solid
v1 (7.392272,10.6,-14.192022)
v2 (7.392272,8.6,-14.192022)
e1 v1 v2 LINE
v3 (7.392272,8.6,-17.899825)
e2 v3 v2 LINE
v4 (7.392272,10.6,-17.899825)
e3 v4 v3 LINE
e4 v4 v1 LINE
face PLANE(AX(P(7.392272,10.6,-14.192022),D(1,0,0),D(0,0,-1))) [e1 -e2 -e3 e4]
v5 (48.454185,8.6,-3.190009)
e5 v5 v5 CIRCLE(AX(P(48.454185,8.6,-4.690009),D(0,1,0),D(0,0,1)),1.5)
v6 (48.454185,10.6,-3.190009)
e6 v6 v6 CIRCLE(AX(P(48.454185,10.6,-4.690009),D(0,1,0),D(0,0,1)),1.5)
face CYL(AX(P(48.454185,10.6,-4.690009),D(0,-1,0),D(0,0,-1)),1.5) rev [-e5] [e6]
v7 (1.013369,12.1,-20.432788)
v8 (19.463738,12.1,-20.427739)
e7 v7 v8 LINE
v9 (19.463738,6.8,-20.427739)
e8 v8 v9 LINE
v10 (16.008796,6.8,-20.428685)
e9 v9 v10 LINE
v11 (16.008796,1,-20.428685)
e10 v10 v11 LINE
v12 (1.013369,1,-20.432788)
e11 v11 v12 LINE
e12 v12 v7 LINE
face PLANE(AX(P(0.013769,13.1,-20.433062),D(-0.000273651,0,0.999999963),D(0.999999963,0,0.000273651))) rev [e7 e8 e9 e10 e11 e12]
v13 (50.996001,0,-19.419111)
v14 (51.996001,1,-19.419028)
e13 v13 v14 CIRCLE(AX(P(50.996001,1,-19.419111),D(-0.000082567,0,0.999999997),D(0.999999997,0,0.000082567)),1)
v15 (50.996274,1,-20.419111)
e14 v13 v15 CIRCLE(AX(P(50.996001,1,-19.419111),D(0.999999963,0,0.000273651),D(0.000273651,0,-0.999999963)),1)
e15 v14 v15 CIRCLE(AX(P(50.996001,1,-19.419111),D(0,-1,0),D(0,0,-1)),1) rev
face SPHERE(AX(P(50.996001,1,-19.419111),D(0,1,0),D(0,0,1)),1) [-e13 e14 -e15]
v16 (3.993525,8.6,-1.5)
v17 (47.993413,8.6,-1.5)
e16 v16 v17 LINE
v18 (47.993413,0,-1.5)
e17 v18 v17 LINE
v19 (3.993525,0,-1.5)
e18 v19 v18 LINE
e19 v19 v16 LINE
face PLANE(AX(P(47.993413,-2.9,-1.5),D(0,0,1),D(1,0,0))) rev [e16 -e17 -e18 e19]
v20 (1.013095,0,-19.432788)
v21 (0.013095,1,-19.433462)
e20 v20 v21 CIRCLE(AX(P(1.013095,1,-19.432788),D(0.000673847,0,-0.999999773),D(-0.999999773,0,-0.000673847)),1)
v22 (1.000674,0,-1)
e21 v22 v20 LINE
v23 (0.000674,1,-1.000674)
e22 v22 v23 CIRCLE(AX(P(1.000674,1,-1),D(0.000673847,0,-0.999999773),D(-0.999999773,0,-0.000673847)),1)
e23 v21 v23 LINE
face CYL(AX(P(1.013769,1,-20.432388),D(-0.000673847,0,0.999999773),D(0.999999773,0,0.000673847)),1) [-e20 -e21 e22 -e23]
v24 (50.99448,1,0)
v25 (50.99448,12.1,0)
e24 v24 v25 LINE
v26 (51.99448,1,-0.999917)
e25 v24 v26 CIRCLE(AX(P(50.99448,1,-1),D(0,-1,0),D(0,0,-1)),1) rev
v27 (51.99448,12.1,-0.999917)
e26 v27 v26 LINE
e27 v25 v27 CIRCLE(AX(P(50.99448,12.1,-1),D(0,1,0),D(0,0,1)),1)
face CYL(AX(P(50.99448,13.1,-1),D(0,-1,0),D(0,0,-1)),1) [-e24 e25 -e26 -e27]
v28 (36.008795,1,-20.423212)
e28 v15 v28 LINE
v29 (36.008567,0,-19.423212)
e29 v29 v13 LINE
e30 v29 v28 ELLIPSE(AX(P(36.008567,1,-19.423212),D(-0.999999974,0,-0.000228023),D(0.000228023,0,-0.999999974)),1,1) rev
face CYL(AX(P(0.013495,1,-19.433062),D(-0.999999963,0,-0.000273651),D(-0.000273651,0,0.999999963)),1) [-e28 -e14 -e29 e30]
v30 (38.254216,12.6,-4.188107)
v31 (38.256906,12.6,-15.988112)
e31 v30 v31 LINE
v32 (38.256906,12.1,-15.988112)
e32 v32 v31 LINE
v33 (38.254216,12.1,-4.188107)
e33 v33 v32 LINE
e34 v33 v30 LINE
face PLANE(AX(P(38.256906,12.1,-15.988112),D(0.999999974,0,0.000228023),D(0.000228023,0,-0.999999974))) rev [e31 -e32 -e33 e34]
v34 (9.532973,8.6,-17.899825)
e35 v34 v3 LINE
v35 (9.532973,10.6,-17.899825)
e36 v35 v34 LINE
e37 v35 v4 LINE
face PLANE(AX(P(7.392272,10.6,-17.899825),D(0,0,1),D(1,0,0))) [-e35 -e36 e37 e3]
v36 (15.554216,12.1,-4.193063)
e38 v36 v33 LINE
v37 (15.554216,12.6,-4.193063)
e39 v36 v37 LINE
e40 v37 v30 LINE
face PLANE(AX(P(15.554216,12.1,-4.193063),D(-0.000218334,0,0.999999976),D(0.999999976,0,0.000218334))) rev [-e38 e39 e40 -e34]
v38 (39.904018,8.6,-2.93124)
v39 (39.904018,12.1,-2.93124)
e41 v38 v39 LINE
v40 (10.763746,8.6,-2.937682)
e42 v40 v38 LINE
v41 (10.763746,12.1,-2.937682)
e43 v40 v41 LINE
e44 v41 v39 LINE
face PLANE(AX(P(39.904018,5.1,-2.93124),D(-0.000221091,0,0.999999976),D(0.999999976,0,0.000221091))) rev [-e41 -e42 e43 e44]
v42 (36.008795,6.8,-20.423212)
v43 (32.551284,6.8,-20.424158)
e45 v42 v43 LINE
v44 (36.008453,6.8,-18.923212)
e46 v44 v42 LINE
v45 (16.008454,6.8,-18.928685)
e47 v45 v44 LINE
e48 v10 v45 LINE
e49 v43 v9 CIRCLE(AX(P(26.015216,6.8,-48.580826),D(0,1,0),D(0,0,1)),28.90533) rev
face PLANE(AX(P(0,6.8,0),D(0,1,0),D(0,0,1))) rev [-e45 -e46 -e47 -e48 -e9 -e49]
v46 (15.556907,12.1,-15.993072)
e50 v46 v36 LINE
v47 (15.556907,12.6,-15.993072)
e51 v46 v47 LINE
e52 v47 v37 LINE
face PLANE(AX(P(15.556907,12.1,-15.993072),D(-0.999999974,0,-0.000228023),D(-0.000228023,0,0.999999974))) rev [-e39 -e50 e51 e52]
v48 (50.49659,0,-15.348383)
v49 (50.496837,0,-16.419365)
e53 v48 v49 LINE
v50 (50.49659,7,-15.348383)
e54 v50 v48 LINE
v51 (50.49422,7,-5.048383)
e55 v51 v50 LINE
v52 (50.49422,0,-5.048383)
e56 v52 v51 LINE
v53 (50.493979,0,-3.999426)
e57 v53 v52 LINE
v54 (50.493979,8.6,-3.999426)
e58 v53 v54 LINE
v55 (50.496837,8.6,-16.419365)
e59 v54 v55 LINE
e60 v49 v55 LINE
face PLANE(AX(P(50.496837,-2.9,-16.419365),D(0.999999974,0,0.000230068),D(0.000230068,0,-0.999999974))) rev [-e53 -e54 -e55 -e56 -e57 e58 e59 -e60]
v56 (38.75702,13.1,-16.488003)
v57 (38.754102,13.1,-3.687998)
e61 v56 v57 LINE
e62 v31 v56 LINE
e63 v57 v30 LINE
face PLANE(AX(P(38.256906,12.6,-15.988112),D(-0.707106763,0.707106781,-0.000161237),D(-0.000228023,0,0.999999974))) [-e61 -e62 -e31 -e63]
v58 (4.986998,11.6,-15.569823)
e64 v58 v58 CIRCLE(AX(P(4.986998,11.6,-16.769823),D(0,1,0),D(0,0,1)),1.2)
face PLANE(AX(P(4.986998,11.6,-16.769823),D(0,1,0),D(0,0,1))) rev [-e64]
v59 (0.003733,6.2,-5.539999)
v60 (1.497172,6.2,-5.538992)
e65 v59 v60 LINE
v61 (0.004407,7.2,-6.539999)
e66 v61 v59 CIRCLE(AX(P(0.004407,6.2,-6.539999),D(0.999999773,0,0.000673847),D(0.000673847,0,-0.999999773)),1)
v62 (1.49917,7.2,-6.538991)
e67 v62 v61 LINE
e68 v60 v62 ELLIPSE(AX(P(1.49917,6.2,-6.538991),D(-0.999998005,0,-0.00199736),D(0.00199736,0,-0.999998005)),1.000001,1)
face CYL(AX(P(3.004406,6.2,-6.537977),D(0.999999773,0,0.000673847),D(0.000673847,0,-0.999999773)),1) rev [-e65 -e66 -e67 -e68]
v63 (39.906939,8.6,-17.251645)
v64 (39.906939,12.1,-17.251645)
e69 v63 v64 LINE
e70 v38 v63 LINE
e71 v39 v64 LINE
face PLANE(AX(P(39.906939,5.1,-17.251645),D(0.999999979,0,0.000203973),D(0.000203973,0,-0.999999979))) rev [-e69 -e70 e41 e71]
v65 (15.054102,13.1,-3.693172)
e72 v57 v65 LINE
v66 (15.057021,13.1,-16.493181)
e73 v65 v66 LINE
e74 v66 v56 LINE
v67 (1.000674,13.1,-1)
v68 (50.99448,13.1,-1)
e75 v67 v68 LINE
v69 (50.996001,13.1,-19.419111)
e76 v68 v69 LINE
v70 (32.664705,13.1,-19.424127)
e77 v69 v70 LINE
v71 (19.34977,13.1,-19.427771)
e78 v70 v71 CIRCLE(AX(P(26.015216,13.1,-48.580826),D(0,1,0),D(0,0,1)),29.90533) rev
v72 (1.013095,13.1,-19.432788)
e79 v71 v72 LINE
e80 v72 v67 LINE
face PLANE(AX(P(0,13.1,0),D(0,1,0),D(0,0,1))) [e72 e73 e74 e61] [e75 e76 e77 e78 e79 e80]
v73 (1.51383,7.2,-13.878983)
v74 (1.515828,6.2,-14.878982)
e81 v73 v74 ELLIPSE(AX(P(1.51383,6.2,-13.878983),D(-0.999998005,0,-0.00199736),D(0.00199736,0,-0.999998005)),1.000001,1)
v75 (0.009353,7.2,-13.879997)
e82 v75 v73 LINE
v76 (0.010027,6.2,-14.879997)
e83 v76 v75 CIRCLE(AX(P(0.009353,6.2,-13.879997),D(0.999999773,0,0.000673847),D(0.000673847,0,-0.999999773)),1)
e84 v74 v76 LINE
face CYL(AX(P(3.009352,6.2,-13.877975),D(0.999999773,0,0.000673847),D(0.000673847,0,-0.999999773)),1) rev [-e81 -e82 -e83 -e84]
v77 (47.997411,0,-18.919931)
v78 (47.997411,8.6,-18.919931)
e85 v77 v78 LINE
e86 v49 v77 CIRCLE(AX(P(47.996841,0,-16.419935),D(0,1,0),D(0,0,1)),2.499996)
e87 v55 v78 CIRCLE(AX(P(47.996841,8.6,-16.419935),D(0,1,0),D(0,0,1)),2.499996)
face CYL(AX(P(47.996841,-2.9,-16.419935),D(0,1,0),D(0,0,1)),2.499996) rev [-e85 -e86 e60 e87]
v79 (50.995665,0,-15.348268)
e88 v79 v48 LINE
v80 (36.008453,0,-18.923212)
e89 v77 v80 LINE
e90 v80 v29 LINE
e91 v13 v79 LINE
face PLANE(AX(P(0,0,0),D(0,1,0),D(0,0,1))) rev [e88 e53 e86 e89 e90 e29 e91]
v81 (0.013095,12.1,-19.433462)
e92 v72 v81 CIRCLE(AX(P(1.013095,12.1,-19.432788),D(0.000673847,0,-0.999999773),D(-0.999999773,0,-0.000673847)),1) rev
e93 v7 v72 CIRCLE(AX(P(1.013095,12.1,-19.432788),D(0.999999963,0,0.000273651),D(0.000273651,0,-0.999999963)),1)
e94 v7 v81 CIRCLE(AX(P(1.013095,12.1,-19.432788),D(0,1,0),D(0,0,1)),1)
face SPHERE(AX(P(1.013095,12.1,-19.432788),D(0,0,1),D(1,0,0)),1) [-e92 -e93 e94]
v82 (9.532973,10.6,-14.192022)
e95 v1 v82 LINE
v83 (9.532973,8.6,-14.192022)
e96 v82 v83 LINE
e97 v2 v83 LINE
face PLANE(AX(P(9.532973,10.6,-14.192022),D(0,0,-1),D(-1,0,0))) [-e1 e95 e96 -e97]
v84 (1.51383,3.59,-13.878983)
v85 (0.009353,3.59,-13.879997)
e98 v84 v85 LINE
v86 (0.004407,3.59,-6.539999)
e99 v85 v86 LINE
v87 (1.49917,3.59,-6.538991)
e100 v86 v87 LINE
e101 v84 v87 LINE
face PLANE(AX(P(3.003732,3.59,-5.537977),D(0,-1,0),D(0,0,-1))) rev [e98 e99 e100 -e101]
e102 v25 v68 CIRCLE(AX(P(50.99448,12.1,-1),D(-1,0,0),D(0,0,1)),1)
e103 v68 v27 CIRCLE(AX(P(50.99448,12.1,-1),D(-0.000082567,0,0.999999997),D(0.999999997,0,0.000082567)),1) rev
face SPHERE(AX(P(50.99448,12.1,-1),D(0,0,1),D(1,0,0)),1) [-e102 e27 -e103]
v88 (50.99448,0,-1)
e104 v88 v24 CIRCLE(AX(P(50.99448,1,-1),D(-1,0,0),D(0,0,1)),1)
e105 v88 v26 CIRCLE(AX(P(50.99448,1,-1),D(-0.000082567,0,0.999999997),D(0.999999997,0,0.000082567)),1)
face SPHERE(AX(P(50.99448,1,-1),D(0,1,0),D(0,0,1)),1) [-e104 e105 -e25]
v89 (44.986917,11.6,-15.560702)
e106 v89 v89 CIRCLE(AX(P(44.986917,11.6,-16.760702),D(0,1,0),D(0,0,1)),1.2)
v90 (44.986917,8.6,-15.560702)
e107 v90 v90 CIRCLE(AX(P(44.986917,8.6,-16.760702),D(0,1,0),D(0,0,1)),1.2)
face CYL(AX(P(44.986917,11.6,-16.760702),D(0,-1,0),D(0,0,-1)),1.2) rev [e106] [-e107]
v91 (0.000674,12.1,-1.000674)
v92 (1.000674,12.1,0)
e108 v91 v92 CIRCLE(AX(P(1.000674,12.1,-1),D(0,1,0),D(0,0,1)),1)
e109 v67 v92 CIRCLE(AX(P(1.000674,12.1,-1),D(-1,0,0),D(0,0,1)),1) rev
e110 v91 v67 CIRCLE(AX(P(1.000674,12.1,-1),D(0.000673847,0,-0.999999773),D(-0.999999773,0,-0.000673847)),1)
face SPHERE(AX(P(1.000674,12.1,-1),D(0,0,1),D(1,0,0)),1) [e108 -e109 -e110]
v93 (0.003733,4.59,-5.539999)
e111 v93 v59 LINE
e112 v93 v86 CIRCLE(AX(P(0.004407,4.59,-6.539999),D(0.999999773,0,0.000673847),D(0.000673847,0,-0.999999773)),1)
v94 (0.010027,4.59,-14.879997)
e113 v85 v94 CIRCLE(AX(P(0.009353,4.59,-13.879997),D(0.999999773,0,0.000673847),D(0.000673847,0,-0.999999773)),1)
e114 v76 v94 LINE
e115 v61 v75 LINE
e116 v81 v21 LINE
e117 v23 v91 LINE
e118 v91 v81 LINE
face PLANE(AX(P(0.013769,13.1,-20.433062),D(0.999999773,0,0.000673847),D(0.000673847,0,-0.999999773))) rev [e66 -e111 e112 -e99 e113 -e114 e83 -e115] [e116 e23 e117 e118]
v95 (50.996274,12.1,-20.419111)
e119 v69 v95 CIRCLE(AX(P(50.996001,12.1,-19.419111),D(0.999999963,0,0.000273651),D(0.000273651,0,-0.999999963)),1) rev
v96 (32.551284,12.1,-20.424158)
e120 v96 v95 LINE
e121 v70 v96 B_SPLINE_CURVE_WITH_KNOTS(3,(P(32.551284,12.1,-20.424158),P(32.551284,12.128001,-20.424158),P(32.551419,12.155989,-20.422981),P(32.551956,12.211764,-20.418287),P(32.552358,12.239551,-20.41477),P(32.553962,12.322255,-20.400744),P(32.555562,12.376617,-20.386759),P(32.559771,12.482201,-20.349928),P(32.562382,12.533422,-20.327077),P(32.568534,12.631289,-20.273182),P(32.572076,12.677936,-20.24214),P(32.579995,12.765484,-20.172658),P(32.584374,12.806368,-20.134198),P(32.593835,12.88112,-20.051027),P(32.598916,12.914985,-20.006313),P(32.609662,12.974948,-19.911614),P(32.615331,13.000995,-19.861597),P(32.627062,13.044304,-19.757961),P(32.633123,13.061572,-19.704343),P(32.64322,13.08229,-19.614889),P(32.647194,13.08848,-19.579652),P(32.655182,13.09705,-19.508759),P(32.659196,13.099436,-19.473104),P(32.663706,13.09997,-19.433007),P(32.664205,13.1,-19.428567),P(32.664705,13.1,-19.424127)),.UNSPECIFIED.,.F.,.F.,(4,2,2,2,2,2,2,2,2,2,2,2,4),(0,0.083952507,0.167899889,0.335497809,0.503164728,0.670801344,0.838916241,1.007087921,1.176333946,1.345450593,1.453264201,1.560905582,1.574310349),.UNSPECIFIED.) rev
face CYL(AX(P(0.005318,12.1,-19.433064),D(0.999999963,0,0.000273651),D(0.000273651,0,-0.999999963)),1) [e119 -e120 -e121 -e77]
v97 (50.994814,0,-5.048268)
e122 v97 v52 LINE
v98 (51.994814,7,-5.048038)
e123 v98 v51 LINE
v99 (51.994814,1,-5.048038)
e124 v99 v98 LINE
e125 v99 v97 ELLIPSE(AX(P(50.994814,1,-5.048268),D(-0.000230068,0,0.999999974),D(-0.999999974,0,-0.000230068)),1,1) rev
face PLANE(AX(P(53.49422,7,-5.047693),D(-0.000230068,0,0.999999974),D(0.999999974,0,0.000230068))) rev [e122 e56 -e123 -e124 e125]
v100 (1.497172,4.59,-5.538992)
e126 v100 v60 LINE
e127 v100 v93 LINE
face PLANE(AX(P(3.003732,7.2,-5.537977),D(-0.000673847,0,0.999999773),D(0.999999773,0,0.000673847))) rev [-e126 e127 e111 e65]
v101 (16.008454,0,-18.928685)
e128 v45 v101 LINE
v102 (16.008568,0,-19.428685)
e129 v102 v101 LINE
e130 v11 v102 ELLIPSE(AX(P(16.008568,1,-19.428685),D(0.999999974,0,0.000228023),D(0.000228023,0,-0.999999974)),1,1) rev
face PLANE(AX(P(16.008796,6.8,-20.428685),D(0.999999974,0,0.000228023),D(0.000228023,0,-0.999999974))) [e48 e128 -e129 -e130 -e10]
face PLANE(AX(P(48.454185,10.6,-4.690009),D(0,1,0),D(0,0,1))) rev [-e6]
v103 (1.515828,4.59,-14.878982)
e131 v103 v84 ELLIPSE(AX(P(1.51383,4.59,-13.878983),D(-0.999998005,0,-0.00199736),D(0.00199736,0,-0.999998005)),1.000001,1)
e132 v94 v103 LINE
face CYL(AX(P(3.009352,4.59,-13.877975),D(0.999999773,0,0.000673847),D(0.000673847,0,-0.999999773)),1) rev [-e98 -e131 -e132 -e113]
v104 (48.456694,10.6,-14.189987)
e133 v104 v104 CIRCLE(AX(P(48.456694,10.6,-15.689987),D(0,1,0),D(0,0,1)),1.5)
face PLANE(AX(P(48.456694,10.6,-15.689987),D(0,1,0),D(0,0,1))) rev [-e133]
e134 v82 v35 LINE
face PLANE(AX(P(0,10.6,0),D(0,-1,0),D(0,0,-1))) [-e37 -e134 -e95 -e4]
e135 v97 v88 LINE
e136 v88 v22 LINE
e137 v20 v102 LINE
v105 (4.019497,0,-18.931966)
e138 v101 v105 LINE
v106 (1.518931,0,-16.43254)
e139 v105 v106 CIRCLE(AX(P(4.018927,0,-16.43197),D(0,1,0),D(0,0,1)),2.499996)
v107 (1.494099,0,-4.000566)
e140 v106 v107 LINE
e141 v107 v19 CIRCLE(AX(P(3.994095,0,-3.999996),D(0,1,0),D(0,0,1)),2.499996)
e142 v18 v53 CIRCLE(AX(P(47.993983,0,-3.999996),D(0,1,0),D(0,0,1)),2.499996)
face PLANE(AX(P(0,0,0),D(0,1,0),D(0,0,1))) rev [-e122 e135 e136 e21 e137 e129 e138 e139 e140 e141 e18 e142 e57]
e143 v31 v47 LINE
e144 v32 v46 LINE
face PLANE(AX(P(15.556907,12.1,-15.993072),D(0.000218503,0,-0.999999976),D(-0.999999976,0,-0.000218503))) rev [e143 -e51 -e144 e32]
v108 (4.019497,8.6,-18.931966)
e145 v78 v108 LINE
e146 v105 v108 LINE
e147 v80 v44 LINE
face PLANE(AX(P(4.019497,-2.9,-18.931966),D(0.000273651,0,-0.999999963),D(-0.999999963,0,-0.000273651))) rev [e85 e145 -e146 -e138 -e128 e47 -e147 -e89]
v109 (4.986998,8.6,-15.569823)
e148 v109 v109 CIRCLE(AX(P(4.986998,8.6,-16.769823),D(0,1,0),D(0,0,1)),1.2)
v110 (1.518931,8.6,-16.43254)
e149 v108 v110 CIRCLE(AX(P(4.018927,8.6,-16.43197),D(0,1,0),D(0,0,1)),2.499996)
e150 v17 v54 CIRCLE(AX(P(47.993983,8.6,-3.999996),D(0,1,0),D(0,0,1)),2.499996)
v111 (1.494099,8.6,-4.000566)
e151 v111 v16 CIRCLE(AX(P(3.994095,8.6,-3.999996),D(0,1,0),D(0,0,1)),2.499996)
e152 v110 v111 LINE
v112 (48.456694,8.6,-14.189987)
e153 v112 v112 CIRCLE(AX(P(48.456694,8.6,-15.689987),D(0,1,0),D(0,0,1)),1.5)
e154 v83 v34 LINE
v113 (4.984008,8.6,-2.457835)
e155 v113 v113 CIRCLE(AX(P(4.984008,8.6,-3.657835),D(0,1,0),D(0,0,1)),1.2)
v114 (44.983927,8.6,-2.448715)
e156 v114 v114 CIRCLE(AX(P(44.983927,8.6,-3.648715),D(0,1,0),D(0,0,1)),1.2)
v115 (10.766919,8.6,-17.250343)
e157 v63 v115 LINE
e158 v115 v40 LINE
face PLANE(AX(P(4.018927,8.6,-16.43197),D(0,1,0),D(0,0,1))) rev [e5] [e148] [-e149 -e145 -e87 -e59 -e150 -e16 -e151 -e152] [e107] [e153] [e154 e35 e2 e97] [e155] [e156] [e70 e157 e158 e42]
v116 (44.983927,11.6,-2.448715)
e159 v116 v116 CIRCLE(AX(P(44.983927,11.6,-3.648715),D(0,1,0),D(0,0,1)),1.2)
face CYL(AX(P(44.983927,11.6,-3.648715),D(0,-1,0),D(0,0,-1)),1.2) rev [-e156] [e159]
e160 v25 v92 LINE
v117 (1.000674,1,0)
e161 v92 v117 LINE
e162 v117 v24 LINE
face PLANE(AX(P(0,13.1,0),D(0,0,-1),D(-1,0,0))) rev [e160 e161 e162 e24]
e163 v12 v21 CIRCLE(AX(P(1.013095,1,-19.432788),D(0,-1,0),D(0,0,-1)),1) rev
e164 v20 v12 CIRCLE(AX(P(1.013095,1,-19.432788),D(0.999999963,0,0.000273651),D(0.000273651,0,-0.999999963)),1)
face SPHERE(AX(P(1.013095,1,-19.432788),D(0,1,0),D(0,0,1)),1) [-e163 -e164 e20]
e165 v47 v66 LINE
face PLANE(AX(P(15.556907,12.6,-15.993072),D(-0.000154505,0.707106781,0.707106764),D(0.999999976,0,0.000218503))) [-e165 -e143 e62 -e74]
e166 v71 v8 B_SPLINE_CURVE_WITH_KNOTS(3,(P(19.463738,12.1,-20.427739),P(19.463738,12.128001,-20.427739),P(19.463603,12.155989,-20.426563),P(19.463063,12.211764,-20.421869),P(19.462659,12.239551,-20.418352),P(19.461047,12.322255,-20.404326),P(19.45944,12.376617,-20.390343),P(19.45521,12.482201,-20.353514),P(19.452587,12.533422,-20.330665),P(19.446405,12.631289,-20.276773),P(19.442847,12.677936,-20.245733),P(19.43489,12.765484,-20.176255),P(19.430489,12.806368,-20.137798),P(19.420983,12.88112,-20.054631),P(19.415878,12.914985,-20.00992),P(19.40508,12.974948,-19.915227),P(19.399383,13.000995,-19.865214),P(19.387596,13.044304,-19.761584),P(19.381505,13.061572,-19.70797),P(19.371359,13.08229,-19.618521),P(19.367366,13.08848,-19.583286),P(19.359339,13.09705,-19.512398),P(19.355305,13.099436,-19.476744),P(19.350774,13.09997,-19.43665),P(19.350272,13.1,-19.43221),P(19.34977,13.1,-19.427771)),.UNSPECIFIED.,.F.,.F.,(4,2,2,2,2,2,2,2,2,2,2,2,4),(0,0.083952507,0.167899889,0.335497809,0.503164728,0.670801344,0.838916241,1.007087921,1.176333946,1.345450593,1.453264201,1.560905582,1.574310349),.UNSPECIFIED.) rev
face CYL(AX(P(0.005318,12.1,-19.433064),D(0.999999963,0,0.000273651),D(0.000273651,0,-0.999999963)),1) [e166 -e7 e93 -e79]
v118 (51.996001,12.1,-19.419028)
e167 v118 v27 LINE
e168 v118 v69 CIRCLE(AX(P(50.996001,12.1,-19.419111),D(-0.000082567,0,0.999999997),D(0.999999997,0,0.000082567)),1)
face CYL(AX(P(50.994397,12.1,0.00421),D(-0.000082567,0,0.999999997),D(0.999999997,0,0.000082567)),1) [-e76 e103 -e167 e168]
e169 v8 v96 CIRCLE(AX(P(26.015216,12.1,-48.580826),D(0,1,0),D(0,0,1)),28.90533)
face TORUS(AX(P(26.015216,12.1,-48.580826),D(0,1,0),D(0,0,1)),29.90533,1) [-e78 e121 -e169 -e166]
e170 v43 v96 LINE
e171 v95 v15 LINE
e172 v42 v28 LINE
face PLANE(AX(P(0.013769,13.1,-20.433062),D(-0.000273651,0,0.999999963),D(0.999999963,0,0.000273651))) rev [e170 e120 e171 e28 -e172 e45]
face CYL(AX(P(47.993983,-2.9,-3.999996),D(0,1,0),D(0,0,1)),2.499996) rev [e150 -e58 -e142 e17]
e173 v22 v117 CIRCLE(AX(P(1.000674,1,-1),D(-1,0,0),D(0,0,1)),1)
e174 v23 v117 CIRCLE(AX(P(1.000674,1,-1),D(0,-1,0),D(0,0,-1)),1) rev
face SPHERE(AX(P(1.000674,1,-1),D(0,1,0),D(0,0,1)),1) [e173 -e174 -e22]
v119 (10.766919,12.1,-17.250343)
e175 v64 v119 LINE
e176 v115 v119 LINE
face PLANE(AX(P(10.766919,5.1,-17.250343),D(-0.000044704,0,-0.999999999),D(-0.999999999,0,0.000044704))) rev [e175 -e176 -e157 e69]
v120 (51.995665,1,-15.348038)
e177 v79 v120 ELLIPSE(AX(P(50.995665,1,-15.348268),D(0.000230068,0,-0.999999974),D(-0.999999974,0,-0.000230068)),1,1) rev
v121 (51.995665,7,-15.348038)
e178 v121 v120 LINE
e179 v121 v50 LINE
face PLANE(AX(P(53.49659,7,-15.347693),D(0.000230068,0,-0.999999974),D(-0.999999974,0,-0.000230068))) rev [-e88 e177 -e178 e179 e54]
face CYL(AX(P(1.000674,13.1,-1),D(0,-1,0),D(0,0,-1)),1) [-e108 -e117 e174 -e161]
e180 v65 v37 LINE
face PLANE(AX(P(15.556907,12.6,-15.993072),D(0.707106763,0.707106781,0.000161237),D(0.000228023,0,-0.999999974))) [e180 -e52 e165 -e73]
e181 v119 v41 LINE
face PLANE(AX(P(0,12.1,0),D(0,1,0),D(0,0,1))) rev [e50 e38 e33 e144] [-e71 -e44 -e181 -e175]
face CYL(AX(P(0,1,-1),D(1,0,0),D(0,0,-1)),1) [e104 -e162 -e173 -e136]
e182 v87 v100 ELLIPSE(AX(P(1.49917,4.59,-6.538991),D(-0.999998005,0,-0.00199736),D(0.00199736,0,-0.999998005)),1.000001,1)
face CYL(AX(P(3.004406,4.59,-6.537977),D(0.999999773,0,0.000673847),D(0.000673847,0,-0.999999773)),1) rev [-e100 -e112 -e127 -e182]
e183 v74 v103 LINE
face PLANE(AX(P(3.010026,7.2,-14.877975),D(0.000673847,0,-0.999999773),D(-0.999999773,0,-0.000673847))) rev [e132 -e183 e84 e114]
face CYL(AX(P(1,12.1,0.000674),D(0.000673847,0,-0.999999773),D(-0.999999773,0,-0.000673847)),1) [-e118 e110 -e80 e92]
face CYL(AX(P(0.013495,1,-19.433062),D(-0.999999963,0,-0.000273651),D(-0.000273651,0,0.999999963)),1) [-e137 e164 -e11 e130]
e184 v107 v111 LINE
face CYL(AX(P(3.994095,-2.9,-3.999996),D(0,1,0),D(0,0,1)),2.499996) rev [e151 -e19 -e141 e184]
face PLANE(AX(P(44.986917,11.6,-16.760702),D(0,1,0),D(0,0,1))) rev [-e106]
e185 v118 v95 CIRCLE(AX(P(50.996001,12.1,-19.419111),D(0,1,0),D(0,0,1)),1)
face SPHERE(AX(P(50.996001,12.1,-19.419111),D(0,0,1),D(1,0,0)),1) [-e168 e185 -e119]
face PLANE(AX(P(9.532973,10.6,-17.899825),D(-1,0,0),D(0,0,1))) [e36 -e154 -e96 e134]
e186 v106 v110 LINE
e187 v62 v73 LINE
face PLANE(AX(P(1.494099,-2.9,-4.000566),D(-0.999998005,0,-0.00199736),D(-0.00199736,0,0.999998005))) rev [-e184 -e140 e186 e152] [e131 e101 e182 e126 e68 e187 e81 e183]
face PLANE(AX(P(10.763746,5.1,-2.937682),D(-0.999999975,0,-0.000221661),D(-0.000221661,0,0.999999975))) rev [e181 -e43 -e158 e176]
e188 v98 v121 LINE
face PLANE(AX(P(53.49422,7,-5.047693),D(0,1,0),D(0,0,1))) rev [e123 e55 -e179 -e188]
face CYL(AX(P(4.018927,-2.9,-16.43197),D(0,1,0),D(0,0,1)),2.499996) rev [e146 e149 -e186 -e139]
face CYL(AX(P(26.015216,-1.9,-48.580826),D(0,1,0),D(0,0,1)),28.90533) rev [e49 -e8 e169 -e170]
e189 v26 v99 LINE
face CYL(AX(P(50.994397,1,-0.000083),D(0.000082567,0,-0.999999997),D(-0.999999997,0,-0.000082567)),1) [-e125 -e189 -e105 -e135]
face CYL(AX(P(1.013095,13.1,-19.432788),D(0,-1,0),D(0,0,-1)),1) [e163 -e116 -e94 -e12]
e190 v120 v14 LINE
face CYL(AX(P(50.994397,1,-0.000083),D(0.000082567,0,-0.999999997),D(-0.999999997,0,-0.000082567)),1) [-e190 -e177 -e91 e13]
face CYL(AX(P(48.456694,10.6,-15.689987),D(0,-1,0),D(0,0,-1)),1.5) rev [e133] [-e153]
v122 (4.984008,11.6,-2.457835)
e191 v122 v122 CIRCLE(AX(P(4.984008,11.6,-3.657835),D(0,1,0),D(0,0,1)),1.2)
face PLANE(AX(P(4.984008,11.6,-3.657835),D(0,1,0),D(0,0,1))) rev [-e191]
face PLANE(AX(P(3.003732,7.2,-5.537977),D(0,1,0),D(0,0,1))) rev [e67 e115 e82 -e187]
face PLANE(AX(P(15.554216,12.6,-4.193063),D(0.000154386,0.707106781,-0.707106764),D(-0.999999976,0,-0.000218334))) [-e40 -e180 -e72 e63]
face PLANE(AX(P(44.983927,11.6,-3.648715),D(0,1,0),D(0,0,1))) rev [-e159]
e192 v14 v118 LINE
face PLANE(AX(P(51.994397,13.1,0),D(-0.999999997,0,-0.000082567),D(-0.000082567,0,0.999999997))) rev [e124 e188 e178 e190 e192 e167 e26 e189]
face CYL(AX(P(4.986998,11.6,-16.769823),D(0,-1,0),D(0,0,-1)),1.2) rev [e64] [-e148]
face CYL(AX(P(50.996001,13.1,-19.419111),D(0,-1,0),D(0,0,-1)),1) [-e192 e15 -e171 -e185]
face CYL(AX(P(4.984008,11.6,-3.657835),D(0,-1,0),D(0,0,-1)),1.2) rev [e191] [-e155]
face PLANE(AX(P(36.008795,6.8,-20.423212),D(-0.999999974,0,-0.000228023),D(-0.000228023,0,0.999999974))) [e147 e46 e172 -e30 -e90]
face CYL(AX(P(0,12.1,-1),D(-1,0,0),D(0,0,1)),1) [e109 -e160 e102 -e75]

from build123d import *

# Parameters (mm, degrees)
EXTRUDE_1_DEPTH      = 13.1
CUT_EXTRUDE_1_DEPTH  = 1
CUT_EXTRUDE_2_DEPTH  = 3.5
CUT_EXTRUDE_3_DEPTH  = 11.5
SKETCH_7_R           = 1.2
CUT_EXTRUDE_4_DEPTH  = 3
CUT_EXTRUDE_5_DEPTH  = 3
SKETCH_17_W          = 10.3
SKETCH_17_H          = 7
CUT_EXTRUDE_7_DEPTH  = 3
SKETCH_23_R          = 28.905330341
CUT_EXTRUDE_16_DEPTH = 15
FILLET_1_R           = 1
FILLET_2_R           = 1
CHAMFER_1_SIZE       = 0.5
FILLET_3_R           = 1
SKETCH_24_W          = 2.140700812
SKETCH_24_H          = 3.70780257
CUT_EXTRUDE_17_DEPTH = 2
FILLET_4_R           = 1
CUT_EXTRUDE_18_DEPTH = 7
SKETCH_27_R          = 1.5
CUT_EXTRUDE_19_DEPTH = 2
CUT_EXTRUDE_20_DEPTH = 6.8


with BuildPart() as part:
    # 草图2 → 凸台-拉伸1 (new body)
    with BuildSketch(Plane(origin=(0, 0, 0), x_dir=(1, 0, 0), z_dir=(0, 1, 0))):
        Polygon((0.013768766, 20.433061971), (0, 0), (51.994397286, 0), (51.996083203, 20.418836971), align=None)
    extrude(amount=EXTRUDE_1_DEPTH)

    # 草图3 → 切除-拉伸1 (cut)
    with BuildSketch(Plane(origin=(0, 13.1, 0), x_dir=(1, 0, 0), z_dir=(0, 1, 0))):
        Polygon((15.554216141, 4.193063032), (38.254215601, 4.188106843), (38.256906278, 15.988112082), (15.556906819, 15.993072091), align=None)
    extrude(amount=-CUT_EXTRUDE_1_DEPTH, mode=Mode.SUBTRACT)

    # 草图4 → 切除-拉伸2 (cut)
    with BuildSketch(Plane(origin=(0, 12.1, 0), x_dir=(1, 0, 0), z_dir=(0, 1, 0))):
        Polygon((11.266979682, 17.10036488), (39.706985915, 17.101636261), (39.703966397, 3.081173841), (11.263967233, 3.087658824), align=None)
    extrude(amount=-CUT_EXTRUDE_2_DEPTH, mode=Mode.SUBTRACT)

    # 草图6 → 切除-拉伸3 (cut)
    with BuildSketch(Plane(origin=(0, 8.6, 0), x_dir=(1, 0, 0), z_dir=(0, 1, 0))):
        with BuildLine():
            Line((4.019496655, 18.931965744), (47.997410654, 18.919931154))
            ThreePointArc((47.997410654, 18.919931154), (49.765007767, 18.187296206), (50.496836532, 16.419365162))
            Line((50.496836532, 16.419365162), (50.493979096, 3.999425891))
            ThreePointArc((50.493979096, 3.999425891), (49.761344148, 2.231828778), (47.993413104, 1.500000013))
            Line((47.993413104, 1.500000013), (3.99352536, 1.500000013))
            ThreePointArc((3.99352536, 1.500000013), (2.225928247, 2.232634961), (1.494099482, 4.000566005))
            Line((1.494099482, 4.000566005), (1.518930662, 16.432539866))
            ThreePointArc((1.518930662, 16.432539866), (2.25156561, 18.200136979), (4.019496655, 18.931965744))
        make_face()
    extrude(amount=-CUT_EXTRUDE_3_DEPTH, mode=Mode.SUBTRACT)

    # 草图7 → 切除-拉伸4 (cut)
    with BuildSketch(Plane(origin=(0, 8.6, 0), x_dir=(1, 0, 0), z_dir=(0, 1, 0))):
        with Locations(Location((4.986997661, 16.769823075, 0), (0, 0, 270))):
            Circle(SKETCH_7_R)
        with Locations(Location((4.984007822, 3.657835416, 0), (0, 0, 270))):
            Circle(SKETCH_7_R)
        with Locations(Location((44.986916621, 16.760702161, 0), (0, 0, 270))):
            Circle(SKETCH_7_R)
        with Locations(Location((44.983926782, 3.648714502, 0), (0, 0, 270))):
            Circle(SKETCH_7_R)
    extrude(amount=CUT_EXTRUDE_4_DEPTH, mode=Mode.SUBTRACT)

    # 草图15 → 切除-拉伸5 (cut)
    with BuildSketch(Plane(origin=(0, 0, 0), x_dir=(-0.0006738472400635568, 0, 0.9999997729649228), z_dir=(-0.9999997729649228, 0, -0.0006738472400635568))):
        Polygon((-5.54, 3.59), (-10.21, 3.59), (-14.88, 3.59), (-14.88, 7.2), (-5.54, 7.2), align=None)
    extrude(amount=-CUT_EXTRUDE_5_DEPTH, mode=Mode.SUBTRACT)

    # 草图17 → 切除-拉伸7 (cut)
    with BuildSketch(Plane(origin=(50.493056282, 0, 0.011616857), x_dir=(-0.00023006840747121236, 0, 0.9999999735342636), z_dir=(-0.9999999735342636, 0, -0.00023006840747121236))):
        with Locations((-10.21, 3.5)):
            Rectangle(SKETCH_17_W, SKETCH_17_H)
    extrude(amount=-CUT_EXTRUDE_7_DEPTH, mode=Mode.SUBTRACT)

    # 草图23 → 切除-拉伸16 (cut)
    with BuildSketch(Plane(origin=(0, 13.1, 0), x_dir=(1, 0, 0), z_dir=(0, 1, 0))):
        with Locations((26.015215658, 48.580825692)):
            Circle(SKETCH_23_R)
    extrude(amount=-CUT_EXTRUDE_16_DEPTH, mode=Mode.SUBTRACT)

    # 圆角1
    fillet_1_edges = [part.edges().sort_by_distance(p)[0] for p in [
        (25.997198643, 13.1, 0),
        (9.738753423, 13.1, -20.430400722),
        (26.007305692, 13.1, -19.675496433),
        (51.995240244, 13.1, -10.209418486),
        (42.273683616, 13.1, -20.421497513),
        (0.006884383, 13.1, -10.216530986),
    ]]
    fillet(fillet_1_edges, radius=FILLET_1_R)

    # 圆角2
    # the kernel refuses this fillet: 1 mm, written as the material it takes off along each edge
    with BuildSketch(Plane(origin=(50.996000655, 12.1, -19.419110607), x_dir=(0.9999999965913674, 0, 8.256673242544318e-05), z_dir=(0, 1, 0))) as fillet_2_piece_1_section:
        Polygon((0, 0), (FILLET_2_R, 0), (FILLET_2_R, FILLET_2_R * 0.999808934229), (FILLET_2_R * 0.00019108402398, FILLET_2_R * 0.999999981743), align=None)
    fillet_2_piece_1 = extrude(amount=FILLET_2_R, mode=Mode.PRIVATE)
    fillet_2_piece_1 = fillet_2_piece_1 - Plane(origin=(50.996000655, 12.1, -19.419110607), x_dir=(-0.707232711871647, 0, 0.706980828070094), z_dir=(0, 1, 0)) * Sphere(FILLET_2_R, mode=Mode.PRIVATE)
    add(fillet_2_piece_1, mode=Mode.SUBTRACT)
    with BuildSketch(Plane(origin=(50.994479849, 12.1, -1), x_dir=(0, 0, 1), z_dir=(0, 1, 0))) as fillet_2_piece_2_section:
        Polygon((0, 0), (FILLET_2_R, 0), (FILLET_2_R, FILLET_2_R * 0.999917436676), (FILLET_2_R * 8.25667324293e-05, FILLET_2_R * 0.999999996591), align=None)
    fillet_2_piece_2 = extrude(amount=FILLET_2_R, mode=Mode.PRIVATE)
    fillet_2_piece_2 = fillet_2_piece_2 - Plane(origin=(50.994479849, 12.1, -1), x_dir=(-0.707077588835758, 0, -0.7071359723322034), z_dir=(0, 1, 0)) * Sphere(FILLET_2_R, mode=Mode.PRIVATE)
    add(fillet_2_piece_2, mode=Mode.SUBTRACT)
    with BuildSketch(Plane(origin=(1.013094961, 12.1, -19.432788467), x_dir=(-0.9999997729649228, 0, -0.0006738472400635567), z_dir=(0, 1, 0))) as fillet_2_piece_3_section:
        Polygon((0, 0), (FILLET_2_R, 0), (FILLET_2_R, -FILLET_2_R * 0.999599883524), (FILLET_2_R * 0.000400196522714, -FILLET_2_R * 0.999999919921), align=None)
    fillet_2_piece_3 = extrude(amount=FILLET_2_R, mode=Mode.PRIVATE)
    fillet_2_piece_3 = fillet_2_piece_3 - Plane(origin=(1.013094961, 12.1, -19.432788467), x_dir=(0.706771710700509, 0, 0.7074416929708596), z_dir=(0, 1, 0)) * Sphere(FILLET_2_R, mode=Mode.PRIVATE)
    add(fillet_2_piece_3, mode=Mode.SUBTRACT)
    with BuildSketch(Plane(origin=(1.000674074, 12.1, -1), x_dir=(-0.9999997729649228, 0, -0.0006738472400635567), z_dir=(0, 1, 0))) as fillet_2_piece_4_section:
        Polygon((0, 0), (FILLET_2_R, 0), (FILLET_2_R, FILLET_2_R * 1.00067407443), (-FILLET_2_R * 0.000673847240067, FILLET_2_R * 0.999999772965), align=None)
    fillet_2_piece_4 = extrude(amount=FILLET_2_R, mode=Mode.PRIVATE)
    fillet_2_piece_4 = fillet_2_piece_4 - Plane(origin=(1.000674074, 12.1, -1), x_dir=(0.707344982042023, 0, -0.7068685000620484), z_dir=(0, 1, 0)) * Sphere(FILLET_2_R, mode=Mode.PRIVATE)
    add(fillet_2_piece_4, mode=Mode.SUBTRACT)
    with BuildSketch(Plane(origin=(0, -2.501685186, 0), x_dir=(0.0006738472400635051, 0, -0.9999997729649227), z_dir=(0, 1, 0))) as fillet_2_piece_5:
        with BuildLine():
            CenterArc((FILLET_2_R * 1.00067407443, -FILLET_2_R), FILLET_2_R, 90, 90.038608606)
            Line((FILLET_2_R * 0.000674301463259, -FILLET_2_R * 1.00067384724), (0, 0))
            Line((0, 0), (FILLET_2_R * 1.00067407443, 0))
        make_face()
    extrude(amount=14.601685186, mode=Mode.SUBTRACT)
    with BuildSketch(Plane(origin=(0.013768766, -2.498999709, -20.433061971), x_dir=(-0.0006738472400636408, 0, 0.9999997729649228), z_dir=(0, 1, 0))) as fillet_2_piece_6:
        with BuildLine():
            CenterArc((FILLET_2_R * 0.999599883524, FILLET_2_R), FILLET_2_R, 180.022929572, 89.977070428)
            Line((-FILLET_2_R * 0.000400036397496, FILLET_2_R * 0.999599803477), (0, 0))
            Line((0, 0), (FILLET_2_R * 0.999599883524, 0))
        make_face()
    extrude(amount=14.598999709, mode=Mode.SUBTRACT)
    with BuildSketch(Plane(origin=(51.994397286, -2.499793592, 0), x_dir=(-1, 0, 0), z_dir=(0, 1, 0))) as fillet_2_piece_7:
        with BuildLine():
            CenterArc((FILLET_2_R * 0.999917436676, -FILLET_2_R), FILLET_2_R, 90, 89.995269275)
            Line((-FILLET_2_R * 8.2559915445e-05, -FILLET_2_R * 0.999917433268), (0, 0))
            Line((0, 0), (FILLET_2_R * 0.999917436676, 0))
        make_face()
    extrude(amount=14.599793592, mode=Mode.SUBTRACT)
    with BuildSketch(Plane(origin=(51.996083203, -2.499522336, -20.418836971), x_dir=(-8.256673242407848e-05, 0, 0.9999999965913674), z_dir=(0, 1, 0))) as fillet_2_piece_8:
        with BuildLine():
            CenterArc((FILLET_2_R * 0.999808934229, -FILLET_2_R), FILLET_2_R, 90, 89.989051692)
            Line((-FILLET_2_R * 0.000191047514369, -FILLET_2_R * 0.999808915976), (0, 0))
            Line((0, 0), (FILLET_2_R * 0.999808934229, 0))
        make_face()
    extrude(amount=14.599522336, mode=Mode.SUBTRACT)

    # 倒角1
    chamfer_1_edges = [part.edges().sort_by_distance(p)[0] for p in [
        (15.55556148, 13.1, -10.093067561),
        (26.904215871, 13.1, -4.190584937),
        (38.25556094, 13.1, -10.088109463),
        (26.906906548, 13.1, -15.990592087),
    ]]
    chamfer(chamfer_1_edges, length=CHAMFER_1_SIZE)

    # 圆角3
    # the kernel refuses this fillet: 1 mm, written as the material it takes off along each edge
    with BuildSketch(Plane(origin=(51.995458107, 0, -12.848037855), x_dir=(0, 1, 0), z_dir=(8.256673242544318e-05, 0, -0.9999999965913674))) as fillet_3_piece_1:
        with BuildLine():
            CenterArc((FILLET_3_R, -FILLET_3_R), FILLET_3_R, 90, 90)
            Line((0, -FILLET_3_R), (0, 0))
            Line((0, 0), (FILLET_3_R, 0))
        make_face()
    extrude(amount=6.570990208, mode=Mode.SUBTRACT)
    with BuildSketch(Plane(origin=(21.963737986, 0, -20.427055345), x_dir=(0, 1, 0), z_dir=(-0.9999999625576317, 0, -0.0002736507542471488))) as fillet_3_piece_2:
        with BuildLine():
            CenterArc((FILLET_3_R, -FILLET_3_R), FILLET_3_R, 90, 90)
            Line((0, -FILLET_3_R), (0, 0))
            Line((0, 0), (FILLET_3_R, 0))
        make_face()
    extrude(amount=20.950370159, mode=Mode.SUBTRACT)
    with BuildSketch(Plane(origin=(26.015215658, 0, -48.580825692), x_dir=(-0.309941939695479, 0, 0.9507554859256947), z_dir=(-0.9507554859256947, 0, -0.309941939695479))) as fillet_3_piece_3:
        with BuildLine():
            CenterArc((28.905330341 + FILLET_3_R, FILLET_3_R), FILLET_3_R, 180, 90)
            Line((28.905330341 + FILLET_3_R, 0), (28.905330341, 0))
            Line((28.905330341, 0), (28.905330341, FILLET_3_R))
        make_face()
    revolve(axis=Axis((26.015215658, 0, -48.580825692), (0, 1, 0)), revolution_arc=36.08010502, mode=Mode.SUBTRACT)
    with BuildSketch(Plane(origin=(50.996274306, 0, -20.41911057), x_dir=(0, 1, 0), z_dir=(-0.9999999625576317, 0, -0.0002736507542471488))) as fillet_3_piece_4:
        with BuildLine():
            CenterArc((FILLET_3_R, -FILLET_3_R), FILLET_3_R, 90, 90)
            Line((0, -FILLET_3_R), (0, 0))
            Line((0, 0), (FILLET_3_R, 0))
        make_face()
    extrude(amount=20.944990968, mode=Mode.SUBTRACT)
    with BuildSketch(Plane(origin=(51.994479846, 0, -0.999917433), x_dir=(0, 1, 0), z_dir=(8.256673242544318e-05, 0, -0.9999999965913674))) as fillet_3_piece_5:
        with BuildLine():
            CenterArc((FILLET_3_R, -FILLET_3_R), FILLET_3_R, 90, 90)
            Line((0, -FILLET_3_R), (0, 0))
            Line((0, 0), (FILLET_3_R, 0))
        make_face()
    extrude(amount=6.54812035, mode=Mode.SUBTRACT)
    with BuildSketch(Plane(origin=(1.000674074, 0, 0), x_dir=(0, 1, 0), z_dir=(1, 0, 0))) as fillet_3_piece_6:
        with BuildLine():
            CenterArc((FILLET_3_R, -FILLET_3_R), FILLET_3_R, 90, 90)
            Line((0, -FILLET_3_R), (0, 0))
            Line((0, 0), (FILLET_3_R, 0))
        make_face()
    extrude(amount=49.993805775, mode=Mode.SUBTRACT)
    with BuildSketch(Plane(origin=(0.013095188, 0, -19.433462315), x_dir=(0, 1, 0), z_dir=(-0.0006738472400635567, 0, 0.9999997729649228))) as fillet_3_piece_7:
        with BuildLine():
            CenterArc((FILLET_3_R, -FILLET_3_R), FILLET_3_R, 90, 90)
            Line((0, -FILLET_3_R), (0, 0))
            Line((0, 0), (FILLET_3_R, 0))
        make_face()
    extrude(amount=18.432792652, mode=Mode.SUBTRACT)
    with BuildSketch(Plane(origin=(1.013094961, 0, -19.432788467), x_dir=(-0.9999997729649229, 0, -0.0006738472400016349), z_dir=(-0.0006738472400016349, 0, 0.9999997729649229))) as fillet_3_piece_8:
        with BuildLine():
            CenterArc((1 - FILLET_3_R, -FILLET_3_R), FILLET_3_R, 0, 90)
            Line((1, -FILLET_3_R), (1, 0))
            Line((1, 0), (1 - FILLET_3_R, 0))
        make_face()
    revolve(axis=Axis((1.013094961, 0, -19.432788467), (0, -1, 0)), revolution_arc=89.977070428, mode=Mode.SUBTRACT)
    with BuildSketch(Plane(origin=(1.000674074, 0, -1), x_dir=(0, 0, 1), z_dir=(1, 0, 0))) as fillet_3_piece_9:
        with BuildLine():
            CenterArc((1 - FILLET_3_R, -FILLET_3_R), FILLET_3_R, 0, 90)
            Line((1, -FILLET_3_R), (1, 0))
            Line((1, 0), (1 - FILLET_3_R, 0))
        make_face()
    revolve(axis=Axis((1.000674074, 0, -1), (0, -1, 0)), revolution_arc=90.038608606, mode=Mode.SUBTRACT)
    with BuildSketch(Plane(origin=(50.994479849, 0, -1), x_dir=(0.9999999965913675, 0, 8.256673243356417e-05), z_dir=(8.256673243356417e-05, 0, -0.9999999965913675))) as fillet_3_piece_10:
        with BuildLine():
            CenterArc((1 - FILLET_3_R, -FILLET_3_R), FILLET_3_R, 0, 90)
            Line((1 - FILLET_3_R, 0), (1, 0))
            Line((1, 0), (1, -FILLET_3_R))
        make_face()
    revolve(axis=Axis((50.994479849, 0, -1), (0, -1, 0)), revolution_arc=89.995269275, mode=Mode.SUBTRACT)
    with BuildSketch(Plane(origin=(50.996000655, 0, -19.419110607), x_dir=(0.0002736507538187996, 0, -0.9999999625576318), z_dir=(-0.9999999625576318, 0, -0.0002736507538187996))) as fillet_3_piece_11:
        with BuildLine():
            CenterArc((1 - FILLET_3_R, -FILLET_3_R), FILLET_3_R, 0, 90)
            Line((1, -FILLET_3_R), (1, 0))
            Line((1, 0), (1 - FILLET_3_R, 0))
        make_face()
    revolve(axis=Axis((50.996000655, 0, -19.419110607), (0, -1, 0)), revolution_arc=89.989051692, mode=Mode.SUBTRACT)

    # 草图24 → 切除-拉伸17 (cut)
    with BuildSketch(Plane(origin=(0, 8.6, 0), x_dir=(1, 0, 0), z_dir=(0, 1, 0))):
        with Locations((8.462622832, 16.045923285)):
            Rectangle(SKETCH_24_W, SKETCH_24_H)
    extrude(amount=CUT_EXTRUDE_17_DEPTH, mode=Mode.SUBTRACT)

    # 圆角4
    fillet_4_edges = [part.edges().sort_by_distance(p)[0] for p in [
        (0.750452697, 7.2, -5.539495567),
        (0.750452697, 3.59, -5.539495567),
        (0.762927244, 3.59, -14.879489282),
        (0.762927244, 7.2, -14.879489282),
    ]]
    fillet(fillet_4_edges, radius=FILLET_4_R)

    # 草图26 → 切除-拉伸18 (cut)
    with BuildSketch(Plane(origin=(0, 12.1, 0), x_dir=(1, 0, 0), z_dir=(0, 1, 0))):
        Polygon((10.766919033, 17.250342525), (39.906938681, 17.251645191), (39.904017699, 2.931239843), (10.76374648, 2.937682491), align=None)
    extrude(amount=-CUT_EXTRUDE_18_DEPTH, mode=Mode.SUBTRACT)

    # 草图27 → 切除-拉伸19 (cut)
    with BuildSketch(Plane(origin=(0, 8.6, 0), x_dir=(1, 0, 0), z_dir=(0, 1, 0))):
        with Locations(Location((48.456693563, 15.689986743, 0), (0, 0, 270))):
            Circle(SKETCH_27_R)
        with Locations(Location((48.454185312, 4.690009029, 0), (0, 0, 270))):
            Circle(SKETCH_27_R)
    extrude(amount=CUT_EXTRUDE_19_DEPTH, mode=Mode.SUBTRACT)

    # 草图28 → 切除-拉伸20 (cut)
    with BuildSketch(Plane(origin=(0, 0, 0), x_dir=(1, 0, 0), z_dir=(0, 1, 0))):
        Polygon((36.008795325, 20.423211905), (36.008407686, 18.723211947), (16.008408414, 18.728684962), (16.008796053, 20.42868492), align=None)
    extrude(amount=CUT_EXTRUDE_20_DEPTH, mode=Mode.SUBTRACT)


solid = part.part
